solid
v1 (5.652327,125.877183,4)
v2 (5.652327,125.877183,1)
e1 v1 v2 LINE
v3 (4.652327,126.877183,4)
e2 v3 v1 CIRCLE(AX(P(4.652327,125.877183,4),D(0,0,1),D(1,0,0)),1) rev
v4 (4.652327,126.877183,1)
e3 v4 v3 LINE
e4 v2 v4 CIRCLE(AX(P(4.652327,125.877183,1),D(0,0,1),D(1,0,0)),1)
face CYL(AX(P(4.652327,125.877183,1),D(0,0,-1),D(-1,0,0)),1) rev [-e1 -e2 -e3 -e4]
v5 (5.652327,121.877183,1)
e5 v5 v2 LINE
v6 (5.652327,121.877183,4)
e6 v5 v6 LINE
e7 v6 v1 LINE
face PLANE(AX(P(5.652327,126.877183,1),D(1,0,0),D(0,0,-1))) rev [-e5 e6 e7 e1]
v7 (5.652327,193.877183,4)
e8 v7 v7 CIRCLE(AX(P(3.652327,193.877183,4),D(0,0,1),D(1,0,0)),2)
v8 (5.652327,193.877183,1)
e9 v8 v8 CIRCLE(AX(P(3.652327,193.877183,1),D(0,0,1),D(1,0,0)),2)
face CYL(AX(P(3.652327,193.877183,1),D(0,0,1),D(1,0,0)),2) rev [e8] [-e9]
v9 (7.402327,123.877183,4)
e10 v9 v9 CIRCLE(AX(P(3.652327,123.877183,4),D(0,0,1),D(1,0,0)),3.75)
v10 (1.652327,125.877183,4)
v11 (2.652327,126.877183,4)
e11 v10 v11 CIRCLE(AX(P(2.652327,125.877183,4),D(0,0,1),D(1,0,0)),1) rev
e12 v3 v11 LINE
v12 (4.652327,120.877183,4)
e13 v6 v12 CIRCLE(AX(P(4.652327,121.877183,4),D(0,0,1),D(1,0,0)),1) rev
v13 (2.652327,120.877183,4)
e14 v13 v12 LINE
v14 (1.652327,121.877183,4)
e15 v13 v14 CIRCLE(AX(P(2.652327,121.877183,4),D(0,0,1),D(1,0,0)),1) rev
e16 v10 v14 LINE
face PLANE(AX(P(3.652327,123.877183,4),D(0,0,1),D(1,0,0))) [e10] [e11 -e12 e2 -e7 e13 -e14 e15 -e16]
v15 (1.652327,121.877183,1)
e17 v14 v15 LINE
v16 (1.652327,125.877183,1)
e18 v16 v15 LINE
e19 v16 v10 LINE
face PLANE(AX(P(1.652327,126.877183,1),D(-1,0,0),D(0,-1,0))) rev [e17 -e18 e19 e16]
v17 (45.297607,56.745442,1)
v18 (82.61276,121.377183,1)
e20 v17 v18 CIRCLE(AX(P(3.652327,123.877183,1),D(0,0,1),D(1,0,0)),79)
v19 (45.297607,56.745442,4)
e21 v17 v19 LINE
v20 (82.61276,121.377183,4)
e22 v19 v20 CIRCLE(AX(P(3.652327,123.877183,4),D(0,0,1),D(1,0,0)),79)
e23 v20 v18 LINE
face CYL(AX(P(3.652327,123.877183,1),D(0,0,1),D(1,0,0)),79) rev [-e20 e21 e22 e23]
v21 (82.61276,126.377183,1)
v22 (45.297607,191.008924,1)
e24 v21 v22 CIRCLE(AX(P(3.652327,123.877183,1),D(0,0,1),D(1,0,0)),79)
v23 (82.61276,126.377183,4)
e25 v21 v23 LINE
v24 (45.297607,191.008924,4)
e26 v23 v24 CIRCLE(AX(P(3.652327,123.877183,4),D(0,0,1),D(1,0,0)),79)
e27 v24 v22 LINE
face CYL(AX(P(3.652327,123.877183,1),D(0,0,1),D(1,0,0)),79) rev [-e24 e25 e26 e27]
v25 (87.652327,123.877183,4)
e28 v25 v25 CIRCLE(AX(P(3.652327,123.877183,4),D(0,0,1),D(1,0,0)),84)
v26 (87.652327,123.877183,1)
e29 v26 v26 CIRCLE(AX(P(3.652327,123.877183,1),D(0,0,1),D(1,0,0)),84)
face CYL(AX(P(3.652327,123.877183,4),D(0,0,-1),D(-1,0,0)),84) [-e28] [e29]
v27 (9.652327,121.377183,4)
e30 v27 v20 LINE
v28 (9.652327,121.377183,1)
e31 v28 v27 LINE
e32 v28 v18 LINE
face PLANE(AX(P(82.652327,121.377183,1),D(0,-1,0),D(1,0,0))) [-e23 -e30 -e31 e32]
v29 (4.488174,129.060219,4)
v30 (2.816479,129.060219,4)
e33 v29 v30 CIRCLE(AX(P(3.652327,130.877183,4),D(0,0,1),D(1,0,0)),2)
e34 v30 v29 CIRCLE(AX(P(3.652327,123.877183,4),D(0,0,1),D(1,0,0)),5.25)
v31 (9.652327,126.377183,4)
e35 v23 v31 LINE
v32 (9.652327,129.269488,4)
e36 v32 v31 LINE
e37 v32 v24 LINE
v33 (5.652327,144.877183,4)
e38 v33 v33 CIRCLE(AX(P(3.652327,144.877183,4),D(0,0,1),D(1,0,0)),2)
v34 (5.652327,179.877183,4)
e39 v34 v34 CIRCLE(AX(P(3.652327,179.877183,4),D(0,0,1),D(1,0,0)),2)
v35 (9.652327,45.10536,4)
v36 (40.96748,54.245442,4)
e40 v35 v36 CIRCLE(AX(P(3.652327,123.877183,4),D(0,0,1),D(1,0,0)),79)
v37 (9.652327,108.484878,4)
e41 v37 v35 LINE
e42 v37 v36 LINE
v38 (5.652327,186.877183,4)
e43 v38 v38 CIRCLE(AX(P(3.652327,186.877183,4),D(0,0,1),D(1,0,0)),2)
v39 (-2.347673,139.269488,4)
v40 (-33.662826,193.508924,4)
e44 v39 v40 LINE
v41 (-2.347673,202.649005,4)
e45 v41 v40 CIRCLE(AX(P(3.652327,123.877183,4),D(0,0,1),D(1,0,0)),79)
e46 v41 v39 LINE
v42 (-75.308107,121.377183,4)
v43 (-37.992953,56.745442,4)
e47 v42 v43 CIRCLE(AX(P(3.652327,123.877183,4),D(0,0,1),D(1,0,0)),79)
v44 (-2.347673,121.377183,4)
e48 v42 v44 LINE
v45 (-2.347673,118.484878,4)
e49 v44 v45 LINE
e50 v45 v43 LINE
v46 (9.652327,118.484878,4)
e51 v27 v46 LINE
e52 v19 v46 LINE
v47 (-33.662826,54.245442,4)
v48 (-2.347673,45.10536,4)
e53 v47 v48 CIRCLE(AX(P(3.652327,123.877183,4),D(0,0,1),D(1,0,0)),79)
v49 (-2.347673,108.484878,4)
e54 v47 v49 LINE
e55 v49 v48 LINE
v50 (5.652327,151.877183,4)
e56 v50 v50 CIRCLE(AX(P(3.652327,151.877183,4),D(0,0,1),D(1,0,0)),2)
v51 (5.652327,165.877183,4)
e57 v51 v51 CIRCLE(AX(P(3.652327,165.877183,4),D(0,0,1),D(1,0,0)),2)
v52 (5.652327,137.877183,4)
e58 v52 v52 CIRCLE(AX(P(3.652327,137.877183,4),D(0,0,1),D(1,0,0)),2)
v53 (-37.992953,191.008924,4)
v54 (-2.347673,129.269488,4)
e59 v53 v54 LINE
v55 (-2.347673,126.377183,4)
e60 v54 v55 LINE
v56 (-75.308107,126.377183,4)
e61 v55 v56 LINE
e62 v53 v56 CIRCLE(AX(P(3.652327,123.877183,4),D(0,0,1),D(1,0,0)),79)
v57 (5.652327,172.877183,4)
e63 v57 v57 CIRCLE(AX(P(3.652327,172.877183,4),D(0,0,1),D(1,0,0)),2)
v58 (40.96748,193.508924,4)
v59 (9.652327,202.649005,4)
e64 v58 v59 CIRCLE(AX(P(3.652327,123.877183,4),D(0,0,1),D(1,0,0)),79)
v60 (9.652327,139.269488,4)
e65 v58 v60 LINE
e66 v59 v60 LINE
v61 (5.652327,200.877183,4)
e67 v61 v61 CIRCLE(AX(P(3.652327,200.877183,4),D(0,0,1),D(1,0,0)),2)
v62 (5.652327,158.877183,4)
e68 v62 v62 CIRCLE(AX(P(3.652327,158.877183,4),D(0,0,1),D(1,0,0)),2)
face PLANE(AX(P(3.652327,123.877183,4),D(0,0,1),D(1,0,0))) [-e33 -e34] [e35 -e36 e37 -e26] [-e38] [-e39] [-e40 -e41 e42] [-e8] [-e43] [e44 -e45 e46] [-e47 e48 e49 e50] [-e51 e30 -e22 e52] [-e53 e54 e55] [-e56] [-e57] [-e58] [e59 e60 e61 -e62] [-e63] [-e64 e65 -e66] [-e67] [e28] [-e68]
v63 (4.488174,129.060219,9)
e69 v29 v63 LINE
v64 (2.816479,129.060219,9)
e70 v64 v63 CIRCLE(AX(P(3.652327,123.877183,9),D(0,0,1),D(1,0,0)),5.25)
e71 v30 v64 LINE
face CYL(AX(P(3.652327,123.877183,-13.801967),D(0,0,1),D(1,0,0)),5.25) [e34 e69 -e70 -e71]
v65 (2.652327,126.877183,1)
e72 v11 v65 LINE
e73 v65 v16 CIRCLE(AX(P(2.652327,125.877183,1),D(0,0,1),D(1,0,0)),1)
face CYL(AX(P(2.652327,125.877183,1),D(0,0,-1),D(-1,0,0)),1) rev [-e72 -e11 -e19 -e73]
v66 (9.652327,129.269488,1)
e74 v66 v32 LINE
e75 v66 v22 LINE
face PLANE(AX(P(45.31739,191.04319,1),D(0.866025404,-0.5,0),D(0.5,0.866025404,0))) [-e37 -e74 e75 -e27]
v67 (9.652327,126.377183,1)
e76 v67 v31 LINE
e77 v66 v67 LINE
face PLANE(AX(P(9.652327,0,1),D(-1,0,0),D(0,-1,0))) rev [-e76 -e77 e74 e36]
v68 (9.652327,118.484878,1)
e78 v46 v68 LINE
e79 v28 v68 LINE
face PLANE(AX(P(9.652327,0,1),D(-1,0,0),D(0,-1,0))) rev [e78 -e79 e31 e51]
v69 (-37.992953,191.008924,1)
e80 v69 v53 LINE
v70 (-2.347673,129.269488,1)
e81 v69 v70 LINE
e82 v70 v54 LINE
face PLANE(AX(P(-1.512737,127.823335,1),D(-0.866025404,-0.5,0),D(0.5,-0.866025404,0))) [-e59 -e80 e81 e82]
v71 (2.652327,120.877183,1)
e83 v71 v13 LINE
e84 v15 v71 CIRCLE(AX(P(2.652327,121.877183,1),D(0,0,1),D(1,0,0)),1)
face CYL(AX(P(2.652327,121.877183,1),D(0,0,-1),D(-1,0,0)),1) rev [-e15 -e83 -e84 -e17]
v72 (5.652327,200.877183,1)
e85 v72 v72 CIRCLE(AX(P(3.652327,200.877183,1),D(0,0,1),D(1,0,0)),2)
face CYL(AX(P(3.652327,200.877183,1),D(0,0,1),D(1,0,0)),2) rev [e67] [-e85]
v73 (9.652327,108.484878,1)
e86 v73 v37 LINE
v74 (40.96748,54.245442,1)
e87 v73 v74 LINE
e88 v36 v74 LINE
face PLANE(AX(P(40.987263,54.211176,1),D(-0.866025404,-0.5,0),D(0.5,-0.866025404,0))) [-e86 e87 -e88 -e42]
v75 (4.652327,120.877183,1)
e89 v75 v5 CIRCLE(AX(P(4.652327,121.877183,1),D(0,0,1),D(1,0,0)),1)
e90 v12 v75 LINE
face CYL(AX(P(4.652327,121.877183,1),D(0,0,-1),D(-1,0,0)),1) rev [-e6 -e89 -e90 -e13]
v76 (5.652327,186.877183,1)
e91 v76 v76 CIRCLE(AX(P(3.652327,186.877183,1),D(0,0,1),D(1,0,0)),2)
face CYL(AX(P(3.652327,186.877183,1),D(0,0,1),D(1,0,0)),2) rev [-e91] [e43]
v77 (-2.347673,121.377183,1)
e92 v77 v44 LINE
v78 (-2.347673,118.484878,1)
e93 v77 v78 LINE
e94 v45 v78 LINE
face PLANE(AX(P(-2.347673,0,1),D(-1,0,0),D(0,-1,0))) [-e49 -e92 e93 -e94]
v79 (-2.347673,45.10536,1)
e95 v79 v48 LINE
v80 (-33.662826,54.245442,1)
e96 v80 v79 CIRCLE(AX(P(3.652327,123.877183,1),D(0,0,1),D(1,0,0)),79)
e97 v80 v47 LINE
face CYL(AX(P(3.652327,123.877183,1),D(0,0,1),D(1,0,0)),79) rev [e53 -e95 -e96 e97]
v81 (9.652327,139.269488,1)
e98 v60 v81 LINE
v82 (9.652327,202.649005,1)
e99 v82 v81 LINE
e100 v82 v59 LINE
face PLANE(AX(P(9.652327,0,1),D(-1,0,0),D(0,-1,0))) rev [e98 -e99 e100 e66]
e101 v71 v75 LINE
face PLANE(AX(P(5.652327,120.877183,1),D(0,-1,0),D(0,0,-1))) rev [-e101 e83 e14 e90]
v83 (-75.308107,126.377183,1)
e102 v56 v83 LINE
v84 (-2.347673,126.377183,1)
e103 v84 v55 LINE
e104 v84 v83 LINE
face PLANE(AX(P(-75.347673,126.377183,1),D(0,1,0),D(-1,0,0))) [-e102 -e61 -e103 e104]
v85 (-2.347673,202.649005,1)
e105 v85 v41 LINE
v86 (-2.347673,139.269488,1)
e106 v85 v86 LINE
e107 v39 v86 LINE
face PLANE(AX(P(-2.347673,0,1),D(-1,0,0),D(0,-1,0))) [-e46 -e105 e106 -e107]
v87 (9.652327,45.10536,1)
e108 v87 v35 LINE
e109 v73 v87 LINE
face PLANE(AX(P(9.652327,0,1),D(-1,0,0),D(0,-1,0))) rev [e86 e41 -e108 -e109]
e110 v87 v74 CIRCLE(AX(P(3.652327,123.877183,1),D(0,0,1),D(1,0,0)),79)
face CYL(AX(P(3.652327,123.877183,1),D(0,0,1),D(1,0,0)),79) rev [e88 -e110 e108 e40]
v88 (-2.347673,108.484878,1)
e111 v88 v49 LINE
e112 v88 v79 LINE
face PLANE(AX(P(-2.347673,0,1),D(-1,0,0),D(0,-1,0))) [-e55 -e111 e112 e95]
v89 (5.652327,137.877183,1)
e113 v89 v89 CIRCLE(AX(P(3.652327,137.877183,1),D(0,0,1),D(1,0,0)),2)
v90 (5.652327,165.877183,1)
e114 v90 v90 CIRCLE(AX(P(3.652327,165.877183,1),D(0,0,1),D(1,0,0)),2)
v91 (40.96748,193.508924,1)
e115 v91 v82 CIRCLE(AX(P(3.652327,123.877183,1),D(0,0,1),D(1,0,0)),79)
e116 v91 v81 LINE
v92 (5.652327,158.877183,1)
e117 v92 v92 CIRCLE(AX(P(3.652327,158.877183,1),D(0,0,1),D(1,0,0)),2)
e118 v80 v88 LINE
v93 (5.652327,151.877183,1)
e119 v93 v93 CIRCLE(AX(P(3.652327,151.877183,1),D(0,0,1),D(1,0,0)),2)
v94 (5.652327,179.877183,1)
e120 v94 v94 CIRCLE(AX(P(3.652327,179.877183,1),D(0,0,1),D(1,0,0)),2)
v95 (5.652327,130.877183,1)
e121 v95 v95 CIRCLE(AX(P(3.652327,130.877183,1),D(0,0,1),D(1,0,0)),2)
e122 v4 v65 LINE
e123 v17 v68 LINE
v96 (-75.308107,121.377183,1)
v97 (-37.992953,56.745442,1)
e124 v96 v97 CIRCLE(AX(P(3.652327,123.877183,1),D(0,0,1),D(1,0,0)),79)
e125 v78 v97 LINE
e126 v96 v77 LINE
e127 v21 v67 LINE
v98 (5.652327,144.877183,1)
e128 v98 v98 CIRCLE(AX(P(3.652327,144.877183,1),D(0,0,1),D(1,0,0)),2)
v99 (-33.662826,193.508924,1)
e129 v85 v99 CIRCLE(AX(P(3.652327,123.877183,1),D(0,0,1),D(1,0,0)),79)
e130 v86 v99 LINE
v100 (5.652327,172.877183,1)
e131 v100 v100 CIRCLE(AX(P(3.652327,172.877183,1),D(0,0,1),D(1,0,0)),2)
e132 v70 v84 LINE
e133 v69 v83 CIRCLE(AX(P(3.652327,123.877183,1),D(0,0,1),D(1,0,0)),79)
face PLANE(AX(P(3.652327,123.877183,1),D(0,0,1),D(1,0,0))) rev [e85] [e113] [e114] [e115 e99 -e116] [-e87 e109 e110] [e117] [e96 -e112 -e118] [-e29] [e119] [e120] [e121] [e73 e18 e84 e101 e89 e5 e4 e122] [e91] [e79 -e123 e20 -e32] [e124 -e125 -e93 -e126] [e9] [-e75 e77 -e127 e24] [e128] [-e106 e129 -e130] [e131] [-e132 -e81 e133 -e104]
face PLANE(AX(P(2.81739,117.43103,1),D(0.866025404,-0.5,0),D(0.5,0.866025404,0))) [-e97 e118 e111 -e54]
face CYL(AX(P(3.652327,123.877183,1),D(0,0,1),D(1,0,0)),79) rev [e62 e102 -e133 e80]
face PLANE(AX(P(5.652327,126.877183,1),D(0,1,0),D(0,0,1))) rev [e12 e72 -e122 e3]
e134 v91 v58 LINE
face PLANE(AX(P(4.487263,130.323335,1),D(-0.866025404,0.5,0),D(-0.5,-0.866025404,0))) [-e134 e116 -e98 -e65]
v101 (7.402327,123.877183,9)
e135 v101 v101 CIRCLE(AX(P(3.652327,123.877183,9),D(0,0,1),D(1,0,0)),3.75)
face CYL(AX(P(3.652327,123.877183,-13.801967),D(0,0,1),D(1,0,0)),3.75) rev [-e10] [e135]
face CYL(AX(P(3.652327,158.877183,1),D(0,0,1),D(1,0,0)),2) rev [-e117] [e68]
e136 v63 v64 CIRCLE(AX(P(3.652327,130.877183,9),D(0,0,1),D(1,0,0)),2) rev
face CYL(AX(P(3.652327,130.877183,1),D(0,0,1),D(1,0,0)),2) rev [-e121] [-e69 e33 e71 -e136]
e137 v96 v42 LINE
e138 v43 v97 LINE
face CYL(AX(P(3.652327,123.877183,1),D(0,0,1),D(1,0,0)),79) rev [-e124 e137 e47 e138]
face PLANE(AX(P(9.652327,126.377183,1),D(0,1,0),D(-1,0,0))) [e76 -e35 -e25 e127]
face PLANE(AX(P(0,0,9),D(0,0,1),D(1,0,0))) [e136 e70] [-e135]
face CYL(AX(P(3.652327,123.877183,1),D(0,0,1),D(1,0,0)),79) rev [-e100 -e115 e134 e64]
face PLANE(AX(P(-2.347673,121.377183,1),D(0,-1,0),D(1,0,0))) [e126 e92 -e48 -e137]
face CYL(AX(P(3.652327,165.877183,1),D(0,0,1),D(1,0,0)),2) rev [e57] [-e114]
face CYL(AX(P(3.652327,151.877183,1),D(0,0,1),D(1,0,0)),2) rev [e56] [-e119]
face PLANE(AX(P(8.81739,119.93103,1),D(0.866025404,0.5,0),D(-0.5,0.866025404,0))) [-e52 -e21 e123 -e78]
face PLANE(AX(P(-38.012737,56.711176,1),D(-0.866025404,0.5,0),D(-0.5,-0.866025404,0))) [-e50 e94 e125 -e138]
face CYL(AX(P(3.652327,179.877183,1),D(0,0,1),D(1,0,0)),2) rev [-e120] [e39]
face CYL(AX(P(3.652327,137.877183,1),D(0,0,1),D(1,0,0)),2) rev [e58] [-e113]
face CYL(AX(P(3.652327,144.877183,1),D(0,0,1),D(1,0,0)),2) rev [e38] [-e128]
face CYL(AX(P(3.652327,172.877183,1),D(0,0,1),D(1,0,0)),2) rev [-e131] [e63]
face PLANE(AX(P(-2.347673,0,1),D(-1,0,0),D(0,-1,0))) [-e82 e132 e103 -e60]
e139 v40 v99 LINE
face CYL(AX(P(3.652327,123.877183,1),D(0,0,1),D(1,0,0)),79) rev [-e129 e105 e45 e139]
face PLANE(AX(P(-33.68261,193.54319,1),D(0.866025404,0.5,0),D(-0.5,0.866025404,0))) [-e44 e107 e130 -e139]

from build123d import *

# Parameters (mm, degrees)
SKETCH2_R               = 84
BOSS_EXTRUDE1_DEPTH     = 3
SKETCH3_R               = 2
CUT_EXTRUDE1_DEPTH      = 3
SKETCH5_W               = 73
SKETCH5_H               = 5
BOSS_EXTRUDE2_DEPTH     = 3
SKETCH6_R               = 2
CUT_EXTRUDE2_DEPTH      = 226.621039578
SKETCH12_W              = 4
SKETCH12_H              = 6
CUT_EXTRUDE3_DEPTH      = 3
FILLET1_R               = 1
BOSS_EXTRUDE3_OUTLINE_R = 3.75
BOSS_EXTRUDE3_DEPTH     = 5
SKETCH16_R              = 2
CUT_EXTRUDE4_DEPTH      = 15.2
CUT_EXTRUDE5_START      = -2
CUT_EXTRUDE5_DEPTH      = 2


# Read off the part's stored shape, not the designer's step: Boss-Extrude3
with BuildPart() as part:
    # Sketch2 → Boss-Extrude1 (new body)
    with BuildSketch(Plane.XY.offset(1)):
        with Locations((3.652326605, 123.87718283)):
            Circle(SKETCH2_R)
    extrude(amount=BOSS_EXTRUDE1_DEPTH)

    # Sketch3 → Cut-Extrude1 (cut)
    with BuildSketch(Plane.XY.offset(4)):
        with BuildLine():
            Line((-2.347673395, 45.105360456), (-2.347673395, 202.649005203))
            ThreePointArc((-2.347673395, 202.649005203), (-75.347673395, 123.87718283), (-2.347673395, 45.105360456))
        make_face()
        with BuildLine():
            Line((9.652326605, 202.649005203), (9.652326605, 45.105360456))
            ThreePointArc((9.652326605, 45.105360456), (61.596265028, 70.178951946), (82.652326605, 123.87718283))
            ThreePointArc((82.652326605, 123.87718283), (61.596265028, 177.575413713), (9.652326605, 202.649005203))
        make_face()
        with Locations((3.652326605, 200.87718283)):
            Circle(SKETCH3_R)
        with Locations((3.652326605, 193.87718283)):
            Circle(SKETCH3_R)
        with Locations((3.652326605, 186.87718283)):
            Circle(SKETCH3_R)
        with Locations((3.652326605, 179.87718283)):
            Circle(SKETCH3_R)
        with Locations((3.652326605, 172.87718283)):
            Circle(SKETCH3_R)
        with Locations((3.652326605, 165.87718283)):
            Circle(SKETCH3_R)
        with Locations((3.652326605, 158.87718283)):
            Circle(SKETCH3_R)
        with Locations((3.652326605, 151.87718283)):
            Circle(SKETCH3_R)
        with Locations((3.652326605, 144.87718283)):
            Circle(SKETCH3_R)
        with Locations((3.652326605, 123.87718283)):
            Circle(SKETCH3_R)
        with Locations((3.652326605, 130.87718283)):
            Circle(SKETCH3_R)
        with Locations((3.652326605, 137.87718283)):
            Circle(SKETCH3_R)
    extrude(amount=-CUT_EXTRUDE1_DEPTH, mode=Mode.SUBTRACT)

    # Sketch5 → Boss-Extrude2 (add)
    with BuildSketch(Plane.XY.offset(4)):
        with Locations((46.152326605, 123.87718283)):
            Rectangle(SKETCH5_W, SKETCH5_H)
        Polygon((4.487263096, 117.431030407), (8.817390114, 119.931030407), (45.317390114, 56.711175931), (40.987263096, 54.211175931), align=None)
        Polygon((-1.512736904, 119.931030407), (2.817390114, 117.431030407), (-33.682609886, 54.211175931), (-38.012736904, 56.711175931), align=None)
        with Locations((-38.847673395, 123.87718283)):
            Rectangle(SKETCH5_W, SKETCH5_H)
        Polygon((2.817390114, 130.323335252), (-1.512736904, 127.823335252), (-38.012736904, 191.043189729), (-33.682609886, 193.543189729), align=None)
        Polygon((8.817390114, 127.823335252), (4.487263096, 130.323335252), (40.987263096, 193.543189729), (45.317390114, 191.043189729), align=None)
    extrude(amount=-BOSS_EXTRUDE2_DEPTH)

    # Sketch6 → Cut-Extrude2 (cut, through all)
    with BuildSketch(Plane.XY.offset(4)):
        with Locations((3.652326605, 130.87718283)):
            Circle(SKETCH6_R)
    extrude(amount=-CUT_EXTRUDE2_DEPTH, mode=Mode.SUBTRACT)

    # Sketch12 → Cut-Extrude3 (cut)
    with BuildSketch(Plane.XY.offset(4)):
        with Locations((3.652326605, 123.87718283)):
            Rectangle(SKETCH12_W, SKETCH12_H)
    extrude(amount=-CUT_EXTRUDE3_DEPTH, mode=Mode.SUBTRACT)

    # Fillet1
    fillet1_edges = [part.edges().sort_by_distance(p)[0] for p in [
        (1.652326605, 120.87718283, 2.5),
        (5.652326605, 126.87718283, 2.5),
        (1.652326605, 126.87718283, 2.5),
        (5.652326605, 120.87718283, 2.5),
    ]]
    fillet(fillet1_edges, radius=FILLET1_R)

    # Boss-Extrude3 outline → Boss-Extrude3 (add)
    with BuildSketch(Plane.XY.offset(4)):
        with BuildLine():
            ThreePointArc((4.48817395, 129.060218544), (3.652326605, 128.87718283), (2.81647926, 129.060218544))
            ThreePointArc((2.81647926, 129.060218544), (3.652326605, 118.62718283), (4.48817395, 129.060218544))
        make_face()
        with Locations((3.652326605, 123.87718283)):
            Circle(BOSS_EXTRUDE3_OUTLINE_R, mode=Mode.SUBTRACT)
    extrude(amount=BOSS_EXTRUDE3_DEPTH)

    # Sketch16 → Cut-Extrude4 (cut)
    with BuildSketch(Plane.XY.offset(16.2)):
        with Locations((3.652326605, 123.87718283)):
            Circle(SKETCH16_R)
    extrude(amount=-CUT_EXTRUDE4_DEPTH, mode=Mode.SUBTRACT)

    # Sketch17 → Cut-Extrude5 (cut)
    with BuildSketch(Plane.XY.offset(16.2).offset(CUT_EXTRUDE5_START)):
        with BuildLine():
            ThreePointArc((2.652326605, 127.491390903), (1.000676176, 126.528833259), (0.038118531, 124.87718283))
            Line((0.038118531, 124.87718283), (1.920275797, 124.87718283))
            ThreePointArc((1.920275797, 124.87718283), (2.238113043, 125.291396392), (2.652326605, 125.609233637))
            Line((2.652326605, 125.609233637), (2.652326605, 127.491390903))
        make_face()
        with BuildLine():
            ThreePointArc((0.038118531, 122.87718283), (1.000676176, 121.2255324), (2.652326605, 120.262974756))
            Line((2.652326605, 120.262974756), (2.652326605, 122.145132022))
            ThreePointArc((2.652326605, 122.145132022), (2.238113043, 122.462969267), (1.920275797, 122.87718283))
            Line((1.920275797, 122.87718283), (0.038118531, 122.87718283))
        make_face()
        with BuildLine():
            Line((4.652326605, 122.145132022), (4.652326605, 120.262974756))
            ThreePointArc((4.652326605, 120.262974756), (6.303977034, 121.2255324), (7.266534679, 122.87718283))
            Line((7.266534679, 122.87718283), (5.384377413, 122.87718283))
            ThreePointArc((5.384377413, 122.87718283), (5.066540167, 122.462969267), (4.652326605, 122.145132022))
        make_face()
        with BuildLine():
            Line((5.384377413, 124.87718283), (7.266534679, 124.87718283))
            ThreePointArc((7.266534679, 124.87718283), (6.303977034, 126.528833259), (4.652326605, 127.491390903))
            Line((4.652326605, 127.491390903), (4.652326605, 125.609233637))
            ThreePointArc((4.652326605, 125.609233637), (5.066540167, 125.291396392), (5.384377413, 124.87718283))
        make_face()
    extrude(amount=CUT_EXTRUDE5_DEPTH, mode=Mode.SUBTRACT)


solid = part.part
